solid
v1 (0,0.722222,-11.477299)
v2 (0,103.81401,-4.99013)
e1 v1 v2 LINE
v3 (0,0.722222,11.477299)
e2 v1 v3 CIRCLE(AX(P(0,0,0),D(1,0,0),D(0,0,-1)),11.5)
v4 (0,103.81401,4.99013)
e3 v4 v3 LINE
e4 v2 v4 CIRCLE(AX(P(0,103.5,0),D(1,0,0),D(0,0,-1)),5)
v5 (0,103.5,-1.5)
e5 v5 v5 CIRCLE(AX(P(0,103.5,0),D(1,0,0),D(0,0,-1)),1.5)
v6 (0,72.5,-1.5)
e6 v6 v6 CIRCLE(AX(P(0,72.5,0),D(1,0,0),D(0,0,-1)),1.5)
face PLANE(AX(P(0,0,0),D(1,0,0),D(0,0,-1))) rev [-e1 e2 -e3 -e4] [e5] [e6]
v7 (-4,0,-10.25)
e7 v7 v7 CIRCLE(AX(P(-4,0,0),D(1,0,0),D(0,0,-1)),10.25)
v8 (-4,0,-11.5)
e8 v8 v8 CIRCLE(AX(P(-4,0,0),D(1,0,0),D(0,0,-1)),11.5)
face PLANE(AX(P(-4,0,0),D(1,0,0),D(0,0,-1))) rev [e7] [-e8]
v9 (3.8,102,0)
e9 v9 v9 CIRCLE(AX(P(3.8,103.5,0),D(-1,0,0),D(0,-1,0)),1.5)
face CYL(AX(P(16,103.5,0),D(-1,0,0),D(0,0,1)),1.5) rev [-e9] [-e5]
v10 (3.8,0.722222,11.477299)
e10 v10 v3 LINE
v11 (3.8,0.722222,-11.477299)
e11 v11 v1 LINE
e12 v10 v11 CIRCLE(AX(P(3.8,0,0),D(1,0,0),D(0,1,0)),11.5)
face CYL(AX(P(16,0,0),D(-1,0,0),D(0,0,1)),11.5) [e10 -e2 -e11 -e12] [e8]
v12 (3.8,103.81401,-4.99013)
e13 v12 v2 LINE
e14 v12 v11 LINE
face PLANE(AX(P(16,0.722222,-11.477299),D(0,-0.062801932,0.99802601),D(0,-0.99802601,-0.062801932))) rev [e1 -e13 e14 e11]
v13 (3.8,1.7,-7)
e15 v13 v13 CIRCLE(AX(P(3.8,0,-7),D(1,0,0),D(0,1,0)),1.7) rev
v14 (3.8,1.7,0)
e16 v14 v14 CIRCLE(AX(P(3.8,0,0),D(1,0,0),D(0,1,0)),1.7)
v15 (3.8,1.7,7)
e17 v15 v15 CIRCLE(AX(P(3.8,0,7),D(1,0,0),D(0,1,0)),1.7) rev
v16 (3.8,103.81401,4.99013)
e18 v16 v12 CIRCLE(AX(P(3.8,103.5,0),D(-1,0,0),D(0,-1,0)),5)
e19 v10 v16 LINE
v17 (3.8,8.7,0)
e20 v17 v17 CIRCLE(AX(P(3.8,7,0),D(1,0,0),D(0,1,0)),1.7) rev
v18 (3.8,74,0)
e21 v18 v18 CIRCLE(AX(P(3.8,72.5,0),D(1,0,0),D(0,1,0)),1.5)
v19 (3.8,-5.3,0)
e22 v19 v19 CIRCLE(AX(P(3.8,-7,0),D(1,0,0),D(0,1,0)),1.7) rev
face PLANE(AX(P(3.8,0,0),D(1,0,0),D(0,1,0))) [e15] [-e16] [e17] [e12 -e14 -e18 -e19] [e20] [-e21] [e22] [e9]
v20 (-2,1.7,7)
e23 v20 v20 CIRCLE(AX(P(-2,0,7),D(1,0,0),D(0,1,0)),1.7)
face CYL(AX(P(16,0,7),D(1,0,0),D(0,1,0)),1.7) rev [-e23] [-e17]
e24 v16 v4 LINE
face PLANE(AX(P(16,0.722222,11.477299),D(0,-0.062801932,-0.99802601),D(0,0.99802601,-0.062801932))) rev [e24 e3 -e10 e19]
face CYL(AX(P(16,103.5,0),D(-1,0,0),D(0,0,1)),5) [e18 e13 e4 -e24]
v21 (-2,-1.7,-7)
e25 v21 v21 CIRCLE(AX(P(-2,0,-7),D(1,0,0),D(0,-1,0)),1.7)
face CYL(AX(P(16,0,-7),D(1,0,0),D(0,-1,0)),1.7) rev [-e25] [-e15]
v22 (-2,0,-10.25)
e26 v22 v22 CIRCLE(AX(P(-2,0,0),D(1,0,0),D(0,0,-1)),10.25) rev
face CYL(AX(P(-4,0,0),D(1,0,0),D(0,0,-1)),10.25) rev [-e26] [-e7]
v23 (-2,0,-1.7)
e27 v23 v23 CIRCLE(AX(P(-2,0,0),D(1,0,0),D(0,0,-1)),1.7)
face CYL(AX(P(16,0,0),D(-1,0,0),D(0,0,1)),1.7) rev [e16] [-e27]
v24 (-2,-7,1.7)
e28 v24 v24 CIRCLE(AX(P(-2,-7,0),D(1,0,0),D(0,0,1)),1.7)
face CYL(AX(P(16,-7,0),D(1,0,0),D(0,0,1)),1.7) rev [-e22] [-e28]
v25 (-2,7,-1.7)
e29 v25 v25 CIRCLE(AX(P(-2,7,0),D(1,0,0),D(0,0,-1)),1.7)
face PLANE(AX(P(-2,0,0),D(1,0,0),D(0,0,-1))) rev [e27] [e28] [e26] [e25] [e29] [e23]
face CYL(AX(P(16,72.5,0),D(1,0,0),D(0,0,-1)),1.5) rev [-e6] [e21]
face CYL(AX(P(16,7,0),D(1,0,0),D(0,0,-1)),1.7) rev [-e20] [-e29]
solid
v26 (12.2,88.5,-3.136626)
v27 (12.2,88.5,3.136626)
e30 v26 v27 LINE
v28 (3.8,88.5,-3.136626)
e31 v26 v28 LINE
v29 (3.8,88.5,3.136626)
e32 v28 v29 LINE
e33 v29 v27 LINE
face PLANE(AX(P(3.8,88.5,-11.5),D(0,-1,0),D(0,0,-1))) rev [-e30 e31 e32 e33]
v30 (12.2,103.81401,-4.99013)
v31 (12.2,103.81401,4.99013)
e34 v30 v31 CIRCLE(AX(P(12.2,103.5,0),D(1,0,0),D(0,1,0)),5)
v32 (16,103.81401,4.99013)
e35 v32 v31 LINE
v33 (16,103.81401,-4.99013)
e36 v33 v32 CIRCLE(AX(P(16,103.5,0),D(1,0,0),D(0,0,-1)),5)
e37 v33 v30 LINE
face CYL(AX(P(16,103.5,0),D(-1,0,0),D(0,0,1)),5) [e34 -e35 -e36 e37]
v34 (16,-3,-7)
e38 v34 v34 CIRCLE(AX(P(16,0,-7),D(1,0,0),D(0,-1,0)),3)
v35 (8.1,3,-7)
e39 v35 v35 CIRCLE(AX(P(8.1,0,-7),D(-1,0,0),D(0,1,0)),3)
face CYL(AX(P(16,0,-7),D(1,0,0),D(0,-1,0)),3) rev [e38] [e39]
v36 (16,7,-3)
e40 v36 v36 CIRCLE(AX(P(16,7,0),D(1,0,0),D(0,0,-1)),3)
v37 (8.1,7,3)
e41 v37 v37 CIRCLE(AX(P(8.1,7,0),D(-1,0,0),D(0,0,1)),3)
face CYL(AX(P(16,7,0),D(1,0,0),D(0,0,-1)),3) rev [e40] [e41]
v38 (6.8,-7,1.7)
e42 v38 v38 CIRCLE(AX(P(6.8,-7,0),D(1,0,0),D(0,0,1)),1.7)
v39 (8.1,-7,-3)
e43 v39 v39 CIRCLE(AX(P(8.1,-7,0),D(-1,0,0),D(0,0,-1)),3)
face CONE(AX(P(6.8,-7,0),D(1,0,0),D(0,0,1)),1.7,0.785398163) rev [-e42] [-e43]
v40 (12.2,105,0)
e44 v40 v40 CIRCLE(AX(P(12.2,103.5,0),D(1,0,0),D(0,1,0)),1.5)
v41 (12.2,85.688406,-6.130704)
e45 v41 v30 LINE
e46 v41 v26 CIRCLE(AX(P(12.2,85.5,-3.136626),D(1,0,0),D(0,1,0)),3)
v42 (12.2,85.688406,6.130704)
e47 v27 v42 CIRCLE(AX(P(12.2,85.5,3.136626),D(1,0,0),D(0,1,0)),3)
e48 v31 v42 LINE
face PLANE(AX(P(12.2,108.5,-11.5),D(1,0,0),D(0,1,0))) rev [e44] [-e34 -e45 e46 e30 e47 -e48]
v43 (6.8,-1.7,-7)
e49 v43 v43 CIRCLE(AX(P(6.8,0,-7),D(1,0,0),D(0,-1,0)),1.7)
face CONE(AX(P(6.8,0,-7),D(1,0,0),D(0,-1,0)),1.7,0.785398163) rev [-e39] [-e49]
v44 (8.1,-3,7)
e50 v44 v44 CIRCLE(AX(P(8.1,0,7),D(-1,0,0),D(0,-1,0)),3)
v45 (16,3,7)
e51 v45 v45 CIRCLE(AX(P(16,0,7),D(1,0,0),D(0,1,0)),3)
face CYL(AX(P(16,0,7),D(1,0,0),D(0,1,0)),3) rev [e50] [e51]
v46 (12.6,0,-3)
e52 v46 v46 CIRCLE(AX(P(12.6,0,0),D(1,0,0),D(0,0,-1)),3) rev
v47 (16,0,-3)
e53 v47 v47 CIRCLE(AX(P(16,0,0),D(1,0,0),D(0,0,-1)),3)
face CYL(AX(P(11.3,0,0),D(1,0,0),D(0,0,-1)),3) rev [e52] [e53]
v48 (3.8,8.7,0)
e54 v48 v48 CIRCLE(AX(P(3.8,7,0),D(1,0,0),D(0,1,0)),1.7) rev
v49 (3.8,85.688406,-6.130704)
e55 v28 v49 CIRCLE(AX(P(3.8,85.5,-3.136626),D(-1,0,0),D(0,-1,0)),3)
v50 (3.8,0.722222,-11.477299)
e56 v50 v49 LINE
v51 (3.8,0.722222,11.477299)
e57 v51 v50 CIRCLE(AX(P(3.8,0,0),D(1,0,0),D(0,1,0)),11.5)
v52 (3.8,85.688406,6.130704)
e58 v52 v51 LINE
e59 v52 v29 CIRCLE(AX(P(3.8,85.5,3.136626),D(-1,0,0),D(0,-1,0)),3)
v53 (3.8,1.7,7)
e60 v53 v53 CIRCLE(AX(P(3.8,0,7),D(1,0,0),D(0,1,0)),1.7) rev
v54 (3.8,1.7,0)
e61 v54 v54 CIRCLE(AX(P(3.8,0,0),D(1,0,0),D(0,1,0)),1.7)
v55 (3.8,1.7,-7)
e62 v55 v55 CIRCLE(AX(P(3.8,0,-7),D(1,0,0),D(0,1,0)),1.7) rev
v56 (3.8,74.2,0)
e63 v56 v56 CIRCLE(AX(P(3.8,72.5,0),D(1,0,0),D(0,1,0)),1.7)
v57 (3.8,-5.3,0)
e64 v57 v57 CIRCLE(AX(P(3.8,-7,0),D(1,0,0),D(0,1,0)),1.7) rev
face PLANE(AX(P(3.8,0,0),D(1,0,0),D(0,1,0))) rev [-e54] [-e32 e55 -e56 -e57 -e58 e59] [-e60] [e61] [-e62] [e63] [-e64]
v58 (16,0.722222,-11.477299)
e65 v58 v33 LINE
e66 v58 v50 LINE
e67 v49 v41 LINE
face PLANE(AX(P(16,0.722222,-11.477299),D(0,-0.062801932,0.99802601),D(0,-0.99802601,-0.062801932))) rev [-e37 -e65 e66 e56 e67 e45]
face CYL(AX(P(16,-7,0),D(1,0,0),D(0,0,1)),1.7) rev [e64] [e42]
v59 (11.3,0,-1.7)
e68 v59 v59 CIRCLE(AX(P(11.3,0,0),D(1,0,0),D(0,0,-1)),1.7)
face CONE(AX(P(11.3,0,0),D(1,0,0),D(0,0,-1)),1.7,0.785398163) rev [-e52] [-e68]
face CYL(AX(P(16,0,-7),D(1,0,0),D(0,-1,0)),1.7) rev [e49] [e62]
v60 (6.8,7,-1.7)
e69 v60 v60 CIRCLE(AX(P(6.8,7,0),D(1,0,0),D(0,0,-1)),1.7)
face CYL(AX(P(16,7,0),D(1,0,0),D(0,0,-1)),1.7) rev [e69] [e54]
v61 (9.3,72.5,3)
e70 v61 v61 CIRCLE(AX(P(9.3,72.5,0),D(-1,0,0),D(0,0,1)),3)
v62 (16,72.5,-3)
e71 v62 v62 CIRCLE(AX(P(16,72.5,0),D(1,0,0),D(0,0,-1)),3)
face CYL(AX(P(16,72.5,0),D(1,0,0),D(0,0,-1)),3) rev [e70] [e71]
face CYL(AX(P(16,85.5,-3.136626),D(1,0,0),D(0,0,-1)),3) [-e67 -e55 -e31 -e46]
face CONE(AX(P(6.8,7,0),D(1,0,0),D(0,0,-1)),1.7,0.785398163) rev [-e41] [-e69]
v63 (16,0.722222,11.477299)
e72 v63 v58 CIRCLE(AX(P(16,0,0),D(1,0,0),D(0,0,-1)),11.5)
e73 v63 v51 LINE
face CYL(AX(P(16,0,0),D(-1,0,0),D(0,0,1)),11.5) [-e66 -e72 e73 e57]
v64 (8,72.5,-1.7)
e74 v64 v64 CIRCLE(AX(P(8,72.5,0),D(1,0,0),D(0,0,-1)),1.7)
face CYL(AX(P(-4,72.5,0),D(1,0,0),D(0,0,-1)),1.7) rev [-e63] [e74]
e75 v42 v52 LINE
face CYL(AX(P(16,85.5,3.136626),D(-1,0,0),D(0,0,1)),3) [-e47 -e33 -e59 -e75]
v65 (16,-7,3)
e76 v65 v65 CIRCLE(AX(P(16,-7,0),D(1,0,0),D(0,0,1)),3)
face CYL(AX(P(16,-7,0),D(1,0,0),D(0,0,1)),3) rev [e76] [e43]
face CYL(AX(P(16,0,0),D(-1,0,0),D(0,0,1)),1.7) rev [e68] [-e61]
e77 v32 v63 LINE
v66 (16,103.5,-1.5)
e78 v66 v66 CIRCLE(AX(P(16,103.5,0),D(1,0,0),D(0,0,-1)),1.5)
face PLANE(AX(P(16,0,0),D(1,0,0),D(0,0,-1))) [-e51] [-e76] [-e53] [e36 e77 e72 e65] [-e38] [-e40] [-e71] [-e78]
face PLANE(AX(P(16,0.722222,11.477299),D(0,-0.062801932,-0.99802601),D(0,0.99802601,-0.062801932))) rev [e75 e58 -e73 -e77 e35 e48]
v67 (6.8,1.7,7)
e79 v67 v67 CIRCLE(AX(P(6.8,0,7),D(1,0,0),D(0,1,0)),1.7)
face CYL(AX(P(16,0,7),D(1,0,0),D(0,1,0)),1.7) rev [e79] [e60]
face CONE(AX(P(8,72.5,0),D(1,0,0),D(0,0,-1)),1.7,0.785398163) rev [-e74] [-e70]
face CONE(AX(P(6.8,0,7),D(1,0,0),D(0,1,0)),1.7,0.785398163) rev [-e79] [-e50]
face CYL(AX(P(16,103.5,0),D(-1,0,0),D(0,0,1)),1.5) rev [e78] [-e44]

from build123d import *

# Parameters (mm, degrees)
SKETCH1_R                                           = 1.5
SKETCH1_R_2                                         = 1.7
BOSS_EXTRUDE1_DEPTH                                 = 16
BOSS_EXTRUDE2_START                                 = -4
SKETCH1_4_R                                         = 11.5
SKETCH1_4_R_2                                       = 10.25
BOSS_EXTRUDE2_DEPTH                                 = 4
BOSS_EXTRUDE3_START                                 = -2
SKETCH1_5_R                                         = 10.25
SKETCH1_5_R_2                                       = 1.7
BOSS_EXTRUDE3_DEPTH                                 = 2
CBORE_FOR_M3_HEX_SOCKET_HEAD_CAP_SCREW1_D           = 3.4
CBORE_FOR_M3_HEX_SOCKET_HEAD_CAP_SCREW1_CBORE_D     = 6
CBORE_FOR_M3_HEX_SOCKET_HEAD_CAP_SCREW1_CBORE_DEPTH = 9.2
CHAMFER1_SIZE                                       = 1.3
CIRPATTERN2_COUNT                                   = 4
CHAMFER1_OF_CIRPATTERN2_SIZE                        = 1.3
SKETCH4_R                                           = 3
CUT_EXTRUDE2_DEPTH                                  = 4.7
CHAMFER2_SIZE                                       = 1.3
CUT_EXTRUDE5_DEPTH                                  = 111.274657107
CUT_EXTRUDE5_DEPTH_BACK                             = 111.274657107
SKETCH6_W                                           = 8.4
SKETCH6_H                                           = 20
FILLET1_R                                           = 3
SKETCH9_R                                           = 1.7
CUT_EXTRUDE6_DEPTH                                  = 110.765659475
CHAMFER3_SIZE                                       = 1.3


with BuildPart() as part:
    # Sketch1 → Boss-Extrude1 (new body)
    with BuildSketch(Plane(origin=(0, 0, 0), x_dir=(0, 0, -1), z_dir=(1, 0, 0))):
        with BuildLine():
            Line((-4.990130052, 103.814009662), (-11.477299119, 0.722222222))
            ThreePointArc((-11.477299119, 0.722222222), (0, -11.5), (11.477299119, 0.722222222))
            Line((11.477299119, 0.722222222), (4.990130052, 103.814009662))
            ThreePointArc((4.990130052, 103.814009662), (0, 108.5), (-4.990130052, 103.814009662))
        make_face()
        with Locations((0, 103.5)):
            Circle(SKETCH1_R, mode=Mode.SUBTRACT)
        Circle(SKETCH1_R_2, mode=Mode.SUBTRACT)
    extrude(amount=BOSS_EXTRUDE1_DEPTH)

    # Sketch1<4> → Boss-Extrude2 (add)
    with BuildSketch(Plane(origin=(0, 0, 0), x_dir=(0, 0, -1), z_dir=(1, 0, 0)).offset(BOSS_EXTRUDE2_START)):
        with Locations(Location((0, 0, 0), (0, 0, 176.399344799))):
            Circle(SKETCH1_4_R)
        Circle(SKETCH1_4_R_2, mode=Mode.SUBTRACT)
    extrude(amount=BOSS_EXTRUDE2_DEPTH)

    # Sketch1<5> → Boss-Extrude3 (add)
    with BuildSketch(Plane(origin=(0, 0, 0), x_dir=(0, 0, -1), z_dir=(1, 0, 0)).offset(BOSS_EXTRUDE3_START)):
        Circle(SKETCH1_5_R)
        Circle(SKETCH1_5_R_2, mode=Mode.SUBTRACT)
    extrude(amount=BOSS_EXTRUDE3_DEPTH)

    # CBORE for M3 Hex Socket Head Cap Screw1 (through all)
    with Locations(Plane(origin=(16, 0, 0), x_dir=(0, 0, -1), z_dir=(1, 0, 0))):
        with Locations((0, 7)):
            cbore_for_m3_hex_socket_head_cap_screw1 = CounterBoreHole(CBORE_FOR_M3_HEX_SOCKET_HEAD_CAP_SCREW1_D / 2, CBORE_FOR_M3_HEX_SOCKET_HEAD_CAP_SCREW1_CBORE_D / 2, CBORE_FOR_M3_HEX_SOCKET_HEAD_CAP_SCREW1_CBORE_DEPTH)

    # Chamfer1
    chamfer1_edges = [part.edges().sort_by_distance(p)[0] for p in [
        (6.8, 7, 3),
    ]]
    chamfer(chamfer1_edges, length=CHAMFER1_SIZE - 0.0001)  # a hair under: the kernel refuses the full size

    # CirPattern2: CBORE for M3 Hex Socket Head Cap Screw1 ×4 about axis
    cirpattern2_axis = Axis((0, 0, 0), (1, 0, 0))
    for i in range(1, CIRPATTERN2_COUNT):
        add(cbore_for_m3_hex_socket_head_cap_screw1.rotate(cirpattern2_axis, i * 360 / CIRPATTERN2_COUNT), mode=Mode.SUBTRACT)

    # Chamfer1 of CirPattern2
    chamfer1_of_cirpattern2_edges = [part.edges().sort_by_distance(p)[0] for p in [
        (6.8, -3, 7),
        (6.8, -7, -3),
        (6.8, 3, -7),
    ]]
    chamfer(chamfer1_of_cirpattern2_edges, length=CHAMFER1_OF_CIRPATTERN2_SIZE - 0.0001)  # a hair under: the kernel refuses the full size

    # Sketch4 → Cut-Extrude2 (cut)
    with BuildSketch(Plane(origin=(16, 0, 0), x_dir=(0, 0, -1), z_dir=(1, 0, 0))):
        Circle(SKETCH4_R)
    extrude(amount=-CUT_EXTRUDE2_DEPTH, mode=Mode.SUBTRACT)

    # Chamfer2
    chamfer2_edges = [part.edges().sort_by_distance(p)[0] for p in [
        (11.3, 0, 3),
    ]]
    chamfer(chamfer2_edges, length=CHAMFER2_SIZE - 0.0001)  # a hair under: the kernel refuses the full size

    # Sketch6 → Cut-Extrude5 (cut, two sides: drawn at the far end of the back side and taken through both)
    with BuildSketch(Plane.XY.offset(-CUT_EXTRUDE5_DEPTH_BACK)):
        with Locations((8, 98.5)):
            Rectangle(SKETCH6_W, SKETCH6_H)
    extrude(amount=CUT_EXTRUDE5_DEPTH + CUT_EXTRUDE5_DEPTH_BACK, mode=Mode.SUBTRACT)

    # Fillet1
    fillet1_edges = [part.edges().sort_by_distance(p)[0] for p in [
        (8, 88.5, -5.953781689),
        (8, 88.5, 5.953781689),
    ]]
    fillet(fillet1_edges, radius=FILLET1_R)


with BuildPart() as body_2:
    # Split1: the piece on the far side of the plane
    add(part.part)
    split(bisect_by=Plane.YZ.offset(3.8), keep=Keep.BOTTOM)


with BuildPart() as part_1:
    add(part.part)

    # Split1
    split(bisect_by=Plane.YZ.offset(3.8), keep=Keep.TOP)


with BuildPart() as cbore_for_m3_hex_socket_head_cap_screw2_tool:
    # Sketch8 → CBORE for M3 Hex Socket Head Cap Screw2 (revolve)
    with BuildSketch(Plane(origin=(16, 72.5, 0), x_dir=(0, 0, -1), z_dir=(0, 1, 0))):
        Polygon((0, 0), (0, 20), (1.5, 20), (1.5, 8), (3, 8), (3, 0), align=None)
    revolve(axis=Axis((22.35, 72.5, 0), (-1, 0, 0)))


with BuildPart() as part_2:
    add(part_1.part)

    # CBORE for M3 Hex Socket Head Cap Screw2: cut by cbore_for_m3_hex_socket_head_cap_screw2_tool
    add(cbore_for_m3_hex_socket_head_cap_screw2_tool.part, mode=Mode.SUBTRACT)

    # Sketch9 → Cut-Extrude6 (cut, through all)
    with BuildSketch(Plane(origin=(8, 0, 0), x_dir=(0, 0, -1), z_dir=(1, 0, 0))):
        with Locations((0, 72.5)):
            Circle(SKETCH9_R)
    extrude(amount=-CUT_EXTRUDE6_DEPTH, mode=Mode.SUBTRACT)

    # Chamfer3
    chamfer3_edges = [part_2.edges().sort_by_distance(p)[0] for p in [
        (8, 72.5, 3),
    ]]
    chamfer(chamfer3_edges, length=CHAMFER3_SIZE - 0.0001)  # a hair under: the kernel refuses the full size


with BuildPart() as body_2_1:
    add(body_2.part)

    # CBORE for M3 Hex Socket Head Cap Screw2: cut by cbore_for_m3_hex_socket_head_cap_screw2_tool
    add(cbore_for_m3_hex_socket_head_cap_screw2_tool.part, mode=Mode.SUBTRACT)


solid = Compound([part_2.part, body_2_1.part])
